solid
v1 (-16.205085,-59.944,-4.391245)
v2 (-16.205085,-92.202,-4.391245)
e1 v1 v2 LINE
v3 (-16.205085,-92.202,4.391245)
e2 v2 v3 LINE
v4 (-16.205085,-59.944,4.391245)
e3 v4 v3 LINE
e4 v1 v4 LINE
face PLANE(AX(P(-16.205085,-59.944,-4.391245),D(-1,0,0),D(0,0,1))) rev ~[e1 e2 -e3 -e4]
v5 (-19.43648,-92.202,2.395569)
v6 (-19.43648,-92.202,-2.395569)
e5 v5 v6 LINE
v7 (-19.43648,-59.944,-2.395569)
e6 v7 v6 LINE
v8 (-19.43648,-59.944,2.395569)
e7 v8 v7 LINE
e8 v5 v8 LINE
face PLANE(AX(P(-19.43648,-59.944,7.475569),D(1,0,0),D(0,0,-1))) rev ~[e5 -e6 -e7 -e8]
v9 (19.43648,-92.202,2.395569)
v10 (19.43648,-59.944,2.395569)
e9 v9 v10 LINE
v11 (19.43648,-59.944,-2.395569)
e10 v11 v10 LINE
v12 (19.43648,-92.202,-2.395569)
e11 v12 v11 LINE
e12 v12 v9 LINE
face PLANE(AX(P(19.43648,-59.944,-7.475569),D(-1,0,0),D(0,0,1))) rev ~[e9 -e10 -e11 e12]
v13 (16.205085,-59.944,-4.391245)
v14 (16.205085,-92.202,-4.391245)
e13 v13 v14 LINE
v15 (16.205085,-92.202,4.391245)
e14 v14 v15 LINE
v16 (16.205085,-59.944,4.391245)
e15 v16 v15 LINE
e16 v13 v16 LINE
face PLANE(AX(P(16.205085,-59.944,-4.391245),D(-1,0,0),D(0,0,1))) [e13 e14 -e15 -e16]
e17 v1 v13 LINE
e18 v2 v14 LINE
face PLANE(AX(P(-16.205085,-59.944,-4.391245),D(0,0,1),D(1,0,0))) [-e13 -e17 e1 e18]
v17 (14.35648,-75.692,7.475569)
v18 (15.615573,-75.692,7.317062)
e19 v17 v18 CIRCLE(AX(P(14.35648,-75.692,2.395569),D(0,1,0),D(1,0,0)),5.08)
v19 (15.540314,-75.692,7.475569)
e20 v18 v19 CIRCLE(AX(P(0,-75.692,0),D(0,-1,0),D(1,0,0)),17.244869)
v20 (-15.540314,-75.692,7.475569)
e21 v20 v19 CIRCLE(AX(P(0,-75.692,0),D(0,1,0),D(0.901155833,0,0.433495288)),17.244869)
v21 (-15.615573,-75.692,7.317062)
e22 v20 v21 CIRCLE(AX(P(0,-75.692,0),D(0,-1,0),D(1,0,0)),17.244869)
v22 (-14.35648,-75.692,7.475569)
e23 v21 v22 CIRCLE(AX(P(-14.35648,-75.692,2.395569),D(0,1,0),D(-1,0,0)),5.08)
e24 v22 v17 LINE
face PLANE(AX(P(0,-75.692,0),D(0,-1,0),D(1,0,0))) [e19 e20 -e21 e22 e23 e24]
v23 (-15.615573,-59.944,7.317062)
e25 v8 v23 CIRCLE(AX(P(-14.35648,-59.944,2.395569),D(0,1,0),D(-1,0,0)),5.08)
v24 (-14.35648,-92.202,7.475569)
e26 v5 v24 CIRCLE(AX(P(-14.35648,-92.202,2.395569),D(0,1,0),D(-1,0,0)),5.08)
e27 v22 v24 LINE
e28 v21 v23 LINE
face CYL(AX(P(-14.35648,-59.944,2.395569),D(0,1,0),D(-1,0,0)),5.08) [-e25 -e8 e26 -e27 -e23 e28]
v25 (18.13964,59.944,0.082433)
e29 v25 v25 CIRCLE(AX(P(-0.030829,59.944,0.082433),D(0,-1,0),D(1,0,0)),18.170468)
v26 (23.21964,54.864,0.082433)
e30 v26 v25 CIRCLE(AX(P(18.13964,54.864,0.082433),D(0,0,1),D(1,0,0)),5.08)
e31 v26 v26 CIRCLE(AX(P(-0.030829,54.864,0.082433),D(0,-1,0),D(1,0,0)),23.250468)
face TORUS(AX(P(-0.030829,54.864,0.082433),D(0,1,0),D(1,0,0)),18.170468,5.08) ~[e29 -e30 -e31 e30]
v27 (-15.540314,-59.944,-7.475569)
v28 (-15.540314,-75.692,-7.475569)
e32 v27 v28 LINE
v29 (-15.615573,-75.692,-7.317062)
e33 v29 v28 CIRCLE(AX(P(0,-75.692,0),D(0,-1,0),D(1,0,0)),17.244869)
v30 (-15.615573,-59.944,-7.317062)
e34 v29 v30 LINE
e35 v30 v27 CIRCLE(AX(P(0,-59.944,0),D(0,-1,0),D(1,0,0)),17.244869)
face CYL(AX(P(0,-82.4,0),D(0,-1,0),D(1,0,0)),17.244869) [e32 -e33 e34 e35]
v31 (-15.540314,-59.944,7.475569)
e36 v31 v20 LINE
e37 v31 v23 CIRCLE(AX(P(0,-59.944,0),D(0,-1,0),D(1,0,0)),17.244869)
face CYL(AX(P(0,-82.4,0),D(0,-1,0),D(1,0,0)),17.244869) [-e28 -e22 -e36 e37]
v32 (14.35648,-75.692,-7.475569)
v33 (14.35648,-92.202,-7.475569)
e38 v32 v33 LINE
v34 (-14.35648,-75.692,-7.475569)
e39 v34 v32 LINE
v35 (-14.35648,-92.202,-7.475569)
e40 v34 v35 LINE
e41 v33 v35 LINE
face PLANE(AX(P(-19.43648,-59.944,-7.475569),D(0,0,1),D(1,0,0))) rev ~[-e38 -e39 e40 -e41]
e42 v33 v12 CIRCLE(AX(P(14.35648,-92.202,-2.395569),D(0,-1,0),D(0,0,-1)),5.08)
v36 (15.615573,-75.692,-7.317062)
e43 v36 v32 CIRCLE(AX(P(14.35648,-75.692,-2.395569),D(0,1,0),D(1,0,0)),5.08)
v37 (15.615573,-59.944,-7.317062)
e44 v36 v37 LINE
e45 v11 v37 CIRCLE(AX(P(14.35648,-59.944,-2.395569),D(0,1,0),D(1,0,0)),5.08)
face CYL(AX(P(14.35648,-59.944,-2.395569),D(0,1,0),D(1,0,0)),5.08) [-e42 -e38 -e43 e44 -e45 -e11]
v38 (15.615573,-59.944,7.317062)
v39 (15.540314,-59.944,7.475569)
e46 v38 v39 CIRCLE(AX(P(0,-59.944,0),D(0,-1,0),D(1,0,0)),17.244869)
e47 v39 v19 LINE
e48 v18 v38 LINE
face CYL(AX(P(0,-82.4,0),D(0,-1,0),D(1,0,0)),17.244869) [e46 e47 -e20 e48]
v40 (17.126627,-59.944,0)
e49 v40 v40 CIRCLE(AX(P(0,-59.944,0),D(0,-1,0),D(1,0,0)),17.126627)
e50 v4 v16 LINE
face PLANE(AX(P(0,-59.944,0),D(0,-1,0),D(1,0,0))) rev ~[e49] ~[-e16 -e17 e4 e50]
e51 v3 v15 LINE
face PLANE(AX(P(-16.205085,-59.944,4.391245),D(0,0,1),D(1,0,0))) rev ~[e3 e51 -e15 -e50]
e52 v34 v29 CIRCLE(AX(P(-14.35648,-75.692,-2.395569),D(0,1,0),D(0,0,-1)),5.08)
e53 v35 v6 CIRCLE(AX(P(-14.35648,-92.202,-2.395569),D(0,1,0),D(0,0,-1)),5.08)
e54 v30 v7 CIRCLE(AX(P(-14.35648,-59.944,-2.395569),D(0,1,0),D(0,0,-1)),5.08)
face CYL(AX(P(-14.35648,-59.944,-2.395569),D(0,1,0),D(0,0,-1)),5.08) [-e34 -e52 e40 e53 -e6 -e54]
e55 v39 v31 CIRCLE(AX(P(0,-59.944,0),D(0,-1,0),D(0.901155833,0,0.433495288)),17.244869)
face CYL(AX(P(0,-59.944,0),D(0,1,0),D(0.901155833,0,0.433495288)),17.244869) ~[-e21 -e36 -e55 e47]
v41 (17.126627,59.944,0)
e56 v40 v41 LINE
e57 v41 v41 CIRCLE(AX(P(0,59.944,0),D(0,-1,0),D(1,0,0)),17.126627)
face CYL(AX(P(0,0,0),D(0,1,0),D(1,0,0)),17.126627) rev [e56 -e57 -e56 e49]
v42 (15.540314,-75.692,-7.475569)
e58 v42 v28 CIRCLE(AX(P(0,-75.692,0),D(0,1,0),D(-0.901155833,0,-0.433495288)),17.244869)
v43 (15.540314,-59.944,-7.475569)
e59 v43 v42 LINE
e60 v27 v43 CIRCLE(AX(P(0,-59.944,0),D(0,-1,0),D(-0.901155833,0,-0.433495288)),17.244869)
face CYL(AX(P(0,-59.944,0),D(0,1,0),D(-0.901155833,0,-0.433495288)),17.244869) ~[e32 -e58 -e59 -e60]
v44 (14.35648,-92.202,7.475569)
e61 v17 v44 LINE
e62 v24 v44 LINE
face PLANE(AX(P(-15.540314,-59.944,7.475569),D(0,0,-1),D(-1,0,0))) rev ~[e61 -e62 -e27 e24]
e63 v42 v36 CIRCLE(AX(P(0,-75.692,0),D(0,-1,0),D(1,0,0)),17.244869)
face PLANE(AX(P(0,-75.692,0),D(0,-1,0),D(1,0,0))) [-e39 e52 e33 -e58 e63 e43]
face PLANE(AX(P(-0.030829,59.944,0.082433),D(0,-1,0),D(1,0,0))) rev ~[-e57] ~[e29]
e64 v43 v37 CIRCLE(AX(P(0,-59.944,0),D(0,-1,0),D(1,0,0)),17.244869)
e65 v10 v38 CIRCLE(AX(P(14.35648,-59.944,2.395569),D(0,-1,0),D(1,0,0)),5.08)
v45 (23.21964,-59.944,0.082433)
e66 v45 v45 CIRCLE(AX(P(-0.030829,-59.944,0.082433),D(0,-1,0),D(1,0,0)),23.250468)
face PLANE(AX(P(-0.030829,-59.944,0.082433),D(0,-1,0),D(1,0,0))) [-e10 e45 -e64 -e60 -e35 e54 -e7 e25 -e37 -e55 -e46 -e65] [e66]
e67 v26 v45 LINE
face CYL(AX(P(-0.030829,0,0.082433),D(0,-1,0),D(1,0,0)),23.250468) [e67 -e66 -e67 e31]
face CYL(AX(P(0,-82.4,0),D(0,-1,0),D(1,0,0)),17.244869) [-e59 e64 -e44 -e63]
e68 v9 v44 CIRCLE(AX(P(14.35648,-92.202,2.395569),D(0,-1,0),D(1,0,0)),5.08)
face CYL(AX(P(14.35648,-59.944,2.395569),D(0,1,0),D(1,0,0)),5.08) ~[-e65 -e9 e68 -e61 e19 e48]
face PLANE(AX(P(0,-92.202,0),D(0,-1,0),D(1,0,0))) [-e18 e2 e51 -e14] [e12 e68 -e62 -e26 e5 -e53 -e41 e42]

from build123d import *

# Parameters (mm, degrees)
F0_R         = 23.2504682004
F0_R_2       = 17.1266274378
F1_DEPTH     = 59.944
F2_R         = 5.08
F4_W         = 32.4101708829
F4_H         = 8.7824892253
F5_DEPTH     = 32.258
F6_W         = 31.7728198101
F6_H         = 11.3427176839
F6_W_2       = 31.0806287388
F6_H_2       = 14.8886315292
F7_DEPTH     = 16.51
F8_T4_DEPTH  = 57.658
F8_T9_DEPTH  = 44.958
F8_S10_R     = 17.2448690912
F8_T11_DEPTH = 24
F8_T15_DEPTH = 44.958
F8_S16_R     = 17.2448690912
F8_T17_DEPTH = 24
F8_T21_DEPTH = 57.658
F8_T26_DEPTH = 44.958
F8_S27_R     = 17.2448690912
F8_T28_DEPTH = 24
F8_T32_DEPTH = 57.658
F8_T37_DEPTH = 44.958
F8_S38_R     = 17.2448690912
F8_T39_DEPTH = 24
F8_T43_DEPTH = 57.658


# Not quite as in the source:
# - a fillet or chamfer that OpenCascade refuses, or shapes differently, is made with other operations: its cross-section is extruded or revolved along the edge and cut away or added


with BuildPart() as f1:
    # F0 (on Front) → F1 (new body, symmetric)
    with BuildSketch(Plane.XZ):
        with Locations((-0.0308285998, 0.0824332965)):
            Circle(F0_R)
        Circle(F0_R_2, mode=Mode.SUBTRACT)
    extrude(amount=F1_DEPTH, both=True)

    # F2
    f2_edges = [f1.edges().sort_by_distance(p)[0] for p in [
        (-23.281297, 59.944, 0.082433),
    ]]
    fillet(f2_edges, radius=F2_R)

    # F4 (on face) → F5 (join)
    with BuildSketch(Plane.XZ.offset(59.944)):
        Polygon((-15.5403143694, 7.475569495), (-19.4364797935, 7.475569495), (-19.4364797935, -7.475569495), (-15.5403143694, -7.475569495), (15.5403143694, -7.475569495), (19.4364797935, -7.475569495), (19.4364797935, 7.475569495), (15.5403143694, 7.475569495), align=None)
        Rectangle(F4_W, F4_H, mode=Mode.SUBTRACT)
        with BuildLine():
            ThreePointArc((15.5403143694, 7.475569495), (0, 17.2448690912), (-15.5403143694, 7.475569495))
            Line((-15.5403143694, 7.475569495), (15.5403143694, 7.475569495))
        make_face()
        with BuildLine():
            Line((15.5403143694, -7.475569495), (-15.5403143694, -7.475569495))
            ThreePointArc((-15.5403143694, -7.475569495), (0, -17.2448690912), (15.5403143694, -7.475569495))
        make_face()
    extrude(amount=F5_DEPTH)

    # F6 (on face) → F7 (cut)
    with BuildSketch(Plane.XZ.offset(92.202)):
        with Locations((0.3460955357, 13.1469283369)):
            Rectangle(F6_W, F6_H)
        with Locations((0, -14.9198852596)):
            Rectangle(F6_W_2, F6_H_2)
    extrude(amount=-F7_DEPTH, mode=Mode.SUBTRACT)

    # F8: fillet of radius 5.08 on 4 edges, made by hand


with BuildPart() as f8_tool2:
    # F8_s3 → F8_t4 (new body)
    with BuildSketch(Plane.XZ.offset(47.244)):
        with BuildLine():
            ThreePointArc((-14.3564797935, -7.475569495), (-17.9485822419, -5.9876719434), (-19.4364797935, -2.395569495))
            Line((-19.4364797935, -2.395569495), (-19.4364797935, -7.475569495))
            Line((-19.4364797935, -7.475569495), (-14.3564797935, -7.475569495))
        make_face()
    extrude(amount=F8_T4_DEPTH)

    split(bisect_by=Plane.XZ.offset(75.692), keep=Keep.TOP)


with BuildPart() as f1_1:
    add(f1.part)

    # F8_t1: cut F8_tool2
    add(f8_tool2.part, mode=Mode.SUBTRACT)


with BuildPart() as f8_tool7:
    # F8_s8 → F8_t9 (new body)
    with BuildSketch(Plane.XZ.offset(59.944)):
        with BuildLine():
            ThreePointArc((-14.3564797935, -7.475569495), (-17.9485822419, -5.9876719434), (-19.4364797935, -2.395569495))
            Line((-19.4364797935, -2.395569495), (-19.4364797935, -7.475569495))
            Line((-19.4364797935, -7.475569495), (-14.3564797935, -7.475569495))
        make_face()
    extrude(amount=F8_T9_DEPTH)

    # F8_s10 → F8_t11 (cut, symmetric)
    with BuildSketch(Plane.XZ.offset(82.4)):
        Circle(F8_S10_R)
    extrude(amount=F8_T11_DEPTH, both=True, mode=Mode.SUBTRACT)


with BuildPart() as f1_2:
    add(f1_1.part)

    # F8_t6: cut F8_tool7
    add(f8_tool7.part, mode=Mode.SUBTRACT)


with BuildPart() as f8_tool13:
    # F8_s14 → F8_t15 (new body)
    with BuildSketch(Plane.XZ.offset(59.944)):
        with BuildLine():
            ThreePointArc((19.4364797935, -2.395569495), (17.9485822419, -5.9876719434), (14.3564797935, -7.475569495))
            Line((14.3564797935, -7.475569495), (19.4364797935, -7.475569495))
            Line((19.4364797935, -7.475569495), (19.4364797935, -2.395569495))
        make_face()
    extrude(amount=F8_T15_DEPTH)

    # F8_s16 → F8_t17 (cut, symmetric)
    with BuildSketch(Plane.XZ.offset(82.4)):
        Circle(F8_S16_R)
    extrude(amount=F8_T17_DEPTH, both=True, mode=Mode.SUBTRACT)


with BuildPart() as f1_3:
    add(f1_2.part)

    # F8_t12: cut F8_tool13
    add(f8_tool13.part, mode=Mode.SUBTRACT)


with BuildPart() as f8_tool19:
    # F8_s20 → F8_t21 (new body)
    with BuildSketch(Plane.XZ.offset(47.244)):
        with BuildLine():
            ThreePointArc((19.4364797935, -2.395569495), (17.9485822419, -5.9876719434), (14.3564797935, -7.475569495))
            Line((14.3564797935, -7.475569495), (19.4364797935, -7.475569495))
            Line((19.4364797935, -7.475569495), (19.4364797935, -2.395569495))
        make_face()
    extrude(amount=F8_T21_DEPTH)

    split(bisect_by=Plane.XZ.offset(75.692), keep=Keep.TOP)


with BuildPart() as f1_4:
    add(f1_3.part)

    # F8_t18: cut F8_tool19
    add(f8_tool19.part, mode=Mode.SUBTRACT)


with BuildPart() as f8_tool24:
    # F8_s25 → F8_t26 (new body)
    with BuildSketch(Plane.XZ.offset(59.944)):
        with BuildLine():
            ThreePointArc((19.4364797935, 2.395569495), (17.9485822419, 5.9876719434), (14.3564797935, 7.475569495))
            Line((14.3564797935, 7.475569495), (19.4364797935, 7.475569495))
            Line((19.4364797935, 7.475569495), (19.4364797935, 2.395569495))
        make_face()
    extrude(amount=F8_T26_DEPTH)

    # F8_s27 → F8_t28 (cut, symmetric)
    with BuildSketch(Plane.XZ.offset(82.4)):
        Circle(F8_S27_R)
    extrude(amount=F8_T28_DEPTH, both=True, mode=Mode.SUBTRACT)


with BuildPart() as f1_5:
    add(f1_4.part)

    # F8_t23: cut F8_tool24
    add(f8_tool24.part, mode=Mode.SUBTRACT)


with BuildPart() as f8_tool30:
    # F8_s31 → F8_t32 (new body)
    with BuildSketch(Plane.XZ.offset(47.244)):
        with BuildLine():
            ThreePointArc((19.4364797935, 2.395569495), (17.9485822419, 5.9876719434), (14.3564797935, 7.475569495))
            Line((14.3564797935, 7.475569495), (19.4364797935, 7.475569495))
            Line((19.4364797935, 7.475569495), (19.4364797935, 2.395569495))
        make_face()
    extrude(amount=F8_T32_DEPTH)

    split(bisect_by=Plane.XZ.offset(75.692), keep=Keep.TOP)


with BuildPart() as f1_6:
    add(f1_5.part)

    # F8_t29: cut F8_tool30
    add(f8_tool30.part, mode=Mode.SUBTRACT)


with BuildPart() as f8_tool35:
    # F8_s36 → F8_t37 (new body)
    with BuildSketch(Plane.XZ.offset(59.944)):
        with BuildLine():
            ThreePointArc((-19.4364797935, 2.395569495), (-17.9485822419, 5.9876719434), (-14.3564797935, 7.475569495))
            Line((-14.3564797935, 7.475569495), (-19.4364797935, 7.475569495))
            Line((-19.4364797935, 7.475569495), (-19.4364797935, 2.395569495))
        make_face()
    extrude(amount=F8_T37_DEPTH)

    # F8_s38 → F8_t39 (cut, symmetric)
    with BuildSketch(Plane.XZ.offset(82.4)):
        Circle(F8_S38_R)
    extrude(amount=F8_T39_DEPTH, both=True, mode=Mode.SUBTRACT)


with BuildPart() as f1_7:
    add(f1_6.part)

    # F8_t34: cut F8_tool35
    add(f8_tool35.part, mode=Mode.SUBTRACT)


with BuildPart() as f8_tool41:
    # F8_s42 → F8_t43 (new body)
    with BuildSketch(Plane.XZ.offset(47.244)):
        with BuildLine():
            ThreePointArc((-19.4364797935, 2.395569495), (-17.9485822419, 5.9876719434), (-14.3564797935, 7.475569495))
            Line((-14.3564797935, 7.475569495), (-19.4364797935, 7.475569495))
            Line((-19.4364797935, 7.475569495), (-19.4364797935, 2.395569495))
        make_face()
    extrude(amount=F8_T43_DEPTH)

    split(bisect_by=Plane.XZ.offset(75.692), keep=Keep.TOP)


with BuildPart() as f1_8:
    add(f1_7.part)

    # F8_t40: cut F8_tool41
    add(f8_tool41.part, mode=Mode.SUBTRACT)


solid = f1_8.part
